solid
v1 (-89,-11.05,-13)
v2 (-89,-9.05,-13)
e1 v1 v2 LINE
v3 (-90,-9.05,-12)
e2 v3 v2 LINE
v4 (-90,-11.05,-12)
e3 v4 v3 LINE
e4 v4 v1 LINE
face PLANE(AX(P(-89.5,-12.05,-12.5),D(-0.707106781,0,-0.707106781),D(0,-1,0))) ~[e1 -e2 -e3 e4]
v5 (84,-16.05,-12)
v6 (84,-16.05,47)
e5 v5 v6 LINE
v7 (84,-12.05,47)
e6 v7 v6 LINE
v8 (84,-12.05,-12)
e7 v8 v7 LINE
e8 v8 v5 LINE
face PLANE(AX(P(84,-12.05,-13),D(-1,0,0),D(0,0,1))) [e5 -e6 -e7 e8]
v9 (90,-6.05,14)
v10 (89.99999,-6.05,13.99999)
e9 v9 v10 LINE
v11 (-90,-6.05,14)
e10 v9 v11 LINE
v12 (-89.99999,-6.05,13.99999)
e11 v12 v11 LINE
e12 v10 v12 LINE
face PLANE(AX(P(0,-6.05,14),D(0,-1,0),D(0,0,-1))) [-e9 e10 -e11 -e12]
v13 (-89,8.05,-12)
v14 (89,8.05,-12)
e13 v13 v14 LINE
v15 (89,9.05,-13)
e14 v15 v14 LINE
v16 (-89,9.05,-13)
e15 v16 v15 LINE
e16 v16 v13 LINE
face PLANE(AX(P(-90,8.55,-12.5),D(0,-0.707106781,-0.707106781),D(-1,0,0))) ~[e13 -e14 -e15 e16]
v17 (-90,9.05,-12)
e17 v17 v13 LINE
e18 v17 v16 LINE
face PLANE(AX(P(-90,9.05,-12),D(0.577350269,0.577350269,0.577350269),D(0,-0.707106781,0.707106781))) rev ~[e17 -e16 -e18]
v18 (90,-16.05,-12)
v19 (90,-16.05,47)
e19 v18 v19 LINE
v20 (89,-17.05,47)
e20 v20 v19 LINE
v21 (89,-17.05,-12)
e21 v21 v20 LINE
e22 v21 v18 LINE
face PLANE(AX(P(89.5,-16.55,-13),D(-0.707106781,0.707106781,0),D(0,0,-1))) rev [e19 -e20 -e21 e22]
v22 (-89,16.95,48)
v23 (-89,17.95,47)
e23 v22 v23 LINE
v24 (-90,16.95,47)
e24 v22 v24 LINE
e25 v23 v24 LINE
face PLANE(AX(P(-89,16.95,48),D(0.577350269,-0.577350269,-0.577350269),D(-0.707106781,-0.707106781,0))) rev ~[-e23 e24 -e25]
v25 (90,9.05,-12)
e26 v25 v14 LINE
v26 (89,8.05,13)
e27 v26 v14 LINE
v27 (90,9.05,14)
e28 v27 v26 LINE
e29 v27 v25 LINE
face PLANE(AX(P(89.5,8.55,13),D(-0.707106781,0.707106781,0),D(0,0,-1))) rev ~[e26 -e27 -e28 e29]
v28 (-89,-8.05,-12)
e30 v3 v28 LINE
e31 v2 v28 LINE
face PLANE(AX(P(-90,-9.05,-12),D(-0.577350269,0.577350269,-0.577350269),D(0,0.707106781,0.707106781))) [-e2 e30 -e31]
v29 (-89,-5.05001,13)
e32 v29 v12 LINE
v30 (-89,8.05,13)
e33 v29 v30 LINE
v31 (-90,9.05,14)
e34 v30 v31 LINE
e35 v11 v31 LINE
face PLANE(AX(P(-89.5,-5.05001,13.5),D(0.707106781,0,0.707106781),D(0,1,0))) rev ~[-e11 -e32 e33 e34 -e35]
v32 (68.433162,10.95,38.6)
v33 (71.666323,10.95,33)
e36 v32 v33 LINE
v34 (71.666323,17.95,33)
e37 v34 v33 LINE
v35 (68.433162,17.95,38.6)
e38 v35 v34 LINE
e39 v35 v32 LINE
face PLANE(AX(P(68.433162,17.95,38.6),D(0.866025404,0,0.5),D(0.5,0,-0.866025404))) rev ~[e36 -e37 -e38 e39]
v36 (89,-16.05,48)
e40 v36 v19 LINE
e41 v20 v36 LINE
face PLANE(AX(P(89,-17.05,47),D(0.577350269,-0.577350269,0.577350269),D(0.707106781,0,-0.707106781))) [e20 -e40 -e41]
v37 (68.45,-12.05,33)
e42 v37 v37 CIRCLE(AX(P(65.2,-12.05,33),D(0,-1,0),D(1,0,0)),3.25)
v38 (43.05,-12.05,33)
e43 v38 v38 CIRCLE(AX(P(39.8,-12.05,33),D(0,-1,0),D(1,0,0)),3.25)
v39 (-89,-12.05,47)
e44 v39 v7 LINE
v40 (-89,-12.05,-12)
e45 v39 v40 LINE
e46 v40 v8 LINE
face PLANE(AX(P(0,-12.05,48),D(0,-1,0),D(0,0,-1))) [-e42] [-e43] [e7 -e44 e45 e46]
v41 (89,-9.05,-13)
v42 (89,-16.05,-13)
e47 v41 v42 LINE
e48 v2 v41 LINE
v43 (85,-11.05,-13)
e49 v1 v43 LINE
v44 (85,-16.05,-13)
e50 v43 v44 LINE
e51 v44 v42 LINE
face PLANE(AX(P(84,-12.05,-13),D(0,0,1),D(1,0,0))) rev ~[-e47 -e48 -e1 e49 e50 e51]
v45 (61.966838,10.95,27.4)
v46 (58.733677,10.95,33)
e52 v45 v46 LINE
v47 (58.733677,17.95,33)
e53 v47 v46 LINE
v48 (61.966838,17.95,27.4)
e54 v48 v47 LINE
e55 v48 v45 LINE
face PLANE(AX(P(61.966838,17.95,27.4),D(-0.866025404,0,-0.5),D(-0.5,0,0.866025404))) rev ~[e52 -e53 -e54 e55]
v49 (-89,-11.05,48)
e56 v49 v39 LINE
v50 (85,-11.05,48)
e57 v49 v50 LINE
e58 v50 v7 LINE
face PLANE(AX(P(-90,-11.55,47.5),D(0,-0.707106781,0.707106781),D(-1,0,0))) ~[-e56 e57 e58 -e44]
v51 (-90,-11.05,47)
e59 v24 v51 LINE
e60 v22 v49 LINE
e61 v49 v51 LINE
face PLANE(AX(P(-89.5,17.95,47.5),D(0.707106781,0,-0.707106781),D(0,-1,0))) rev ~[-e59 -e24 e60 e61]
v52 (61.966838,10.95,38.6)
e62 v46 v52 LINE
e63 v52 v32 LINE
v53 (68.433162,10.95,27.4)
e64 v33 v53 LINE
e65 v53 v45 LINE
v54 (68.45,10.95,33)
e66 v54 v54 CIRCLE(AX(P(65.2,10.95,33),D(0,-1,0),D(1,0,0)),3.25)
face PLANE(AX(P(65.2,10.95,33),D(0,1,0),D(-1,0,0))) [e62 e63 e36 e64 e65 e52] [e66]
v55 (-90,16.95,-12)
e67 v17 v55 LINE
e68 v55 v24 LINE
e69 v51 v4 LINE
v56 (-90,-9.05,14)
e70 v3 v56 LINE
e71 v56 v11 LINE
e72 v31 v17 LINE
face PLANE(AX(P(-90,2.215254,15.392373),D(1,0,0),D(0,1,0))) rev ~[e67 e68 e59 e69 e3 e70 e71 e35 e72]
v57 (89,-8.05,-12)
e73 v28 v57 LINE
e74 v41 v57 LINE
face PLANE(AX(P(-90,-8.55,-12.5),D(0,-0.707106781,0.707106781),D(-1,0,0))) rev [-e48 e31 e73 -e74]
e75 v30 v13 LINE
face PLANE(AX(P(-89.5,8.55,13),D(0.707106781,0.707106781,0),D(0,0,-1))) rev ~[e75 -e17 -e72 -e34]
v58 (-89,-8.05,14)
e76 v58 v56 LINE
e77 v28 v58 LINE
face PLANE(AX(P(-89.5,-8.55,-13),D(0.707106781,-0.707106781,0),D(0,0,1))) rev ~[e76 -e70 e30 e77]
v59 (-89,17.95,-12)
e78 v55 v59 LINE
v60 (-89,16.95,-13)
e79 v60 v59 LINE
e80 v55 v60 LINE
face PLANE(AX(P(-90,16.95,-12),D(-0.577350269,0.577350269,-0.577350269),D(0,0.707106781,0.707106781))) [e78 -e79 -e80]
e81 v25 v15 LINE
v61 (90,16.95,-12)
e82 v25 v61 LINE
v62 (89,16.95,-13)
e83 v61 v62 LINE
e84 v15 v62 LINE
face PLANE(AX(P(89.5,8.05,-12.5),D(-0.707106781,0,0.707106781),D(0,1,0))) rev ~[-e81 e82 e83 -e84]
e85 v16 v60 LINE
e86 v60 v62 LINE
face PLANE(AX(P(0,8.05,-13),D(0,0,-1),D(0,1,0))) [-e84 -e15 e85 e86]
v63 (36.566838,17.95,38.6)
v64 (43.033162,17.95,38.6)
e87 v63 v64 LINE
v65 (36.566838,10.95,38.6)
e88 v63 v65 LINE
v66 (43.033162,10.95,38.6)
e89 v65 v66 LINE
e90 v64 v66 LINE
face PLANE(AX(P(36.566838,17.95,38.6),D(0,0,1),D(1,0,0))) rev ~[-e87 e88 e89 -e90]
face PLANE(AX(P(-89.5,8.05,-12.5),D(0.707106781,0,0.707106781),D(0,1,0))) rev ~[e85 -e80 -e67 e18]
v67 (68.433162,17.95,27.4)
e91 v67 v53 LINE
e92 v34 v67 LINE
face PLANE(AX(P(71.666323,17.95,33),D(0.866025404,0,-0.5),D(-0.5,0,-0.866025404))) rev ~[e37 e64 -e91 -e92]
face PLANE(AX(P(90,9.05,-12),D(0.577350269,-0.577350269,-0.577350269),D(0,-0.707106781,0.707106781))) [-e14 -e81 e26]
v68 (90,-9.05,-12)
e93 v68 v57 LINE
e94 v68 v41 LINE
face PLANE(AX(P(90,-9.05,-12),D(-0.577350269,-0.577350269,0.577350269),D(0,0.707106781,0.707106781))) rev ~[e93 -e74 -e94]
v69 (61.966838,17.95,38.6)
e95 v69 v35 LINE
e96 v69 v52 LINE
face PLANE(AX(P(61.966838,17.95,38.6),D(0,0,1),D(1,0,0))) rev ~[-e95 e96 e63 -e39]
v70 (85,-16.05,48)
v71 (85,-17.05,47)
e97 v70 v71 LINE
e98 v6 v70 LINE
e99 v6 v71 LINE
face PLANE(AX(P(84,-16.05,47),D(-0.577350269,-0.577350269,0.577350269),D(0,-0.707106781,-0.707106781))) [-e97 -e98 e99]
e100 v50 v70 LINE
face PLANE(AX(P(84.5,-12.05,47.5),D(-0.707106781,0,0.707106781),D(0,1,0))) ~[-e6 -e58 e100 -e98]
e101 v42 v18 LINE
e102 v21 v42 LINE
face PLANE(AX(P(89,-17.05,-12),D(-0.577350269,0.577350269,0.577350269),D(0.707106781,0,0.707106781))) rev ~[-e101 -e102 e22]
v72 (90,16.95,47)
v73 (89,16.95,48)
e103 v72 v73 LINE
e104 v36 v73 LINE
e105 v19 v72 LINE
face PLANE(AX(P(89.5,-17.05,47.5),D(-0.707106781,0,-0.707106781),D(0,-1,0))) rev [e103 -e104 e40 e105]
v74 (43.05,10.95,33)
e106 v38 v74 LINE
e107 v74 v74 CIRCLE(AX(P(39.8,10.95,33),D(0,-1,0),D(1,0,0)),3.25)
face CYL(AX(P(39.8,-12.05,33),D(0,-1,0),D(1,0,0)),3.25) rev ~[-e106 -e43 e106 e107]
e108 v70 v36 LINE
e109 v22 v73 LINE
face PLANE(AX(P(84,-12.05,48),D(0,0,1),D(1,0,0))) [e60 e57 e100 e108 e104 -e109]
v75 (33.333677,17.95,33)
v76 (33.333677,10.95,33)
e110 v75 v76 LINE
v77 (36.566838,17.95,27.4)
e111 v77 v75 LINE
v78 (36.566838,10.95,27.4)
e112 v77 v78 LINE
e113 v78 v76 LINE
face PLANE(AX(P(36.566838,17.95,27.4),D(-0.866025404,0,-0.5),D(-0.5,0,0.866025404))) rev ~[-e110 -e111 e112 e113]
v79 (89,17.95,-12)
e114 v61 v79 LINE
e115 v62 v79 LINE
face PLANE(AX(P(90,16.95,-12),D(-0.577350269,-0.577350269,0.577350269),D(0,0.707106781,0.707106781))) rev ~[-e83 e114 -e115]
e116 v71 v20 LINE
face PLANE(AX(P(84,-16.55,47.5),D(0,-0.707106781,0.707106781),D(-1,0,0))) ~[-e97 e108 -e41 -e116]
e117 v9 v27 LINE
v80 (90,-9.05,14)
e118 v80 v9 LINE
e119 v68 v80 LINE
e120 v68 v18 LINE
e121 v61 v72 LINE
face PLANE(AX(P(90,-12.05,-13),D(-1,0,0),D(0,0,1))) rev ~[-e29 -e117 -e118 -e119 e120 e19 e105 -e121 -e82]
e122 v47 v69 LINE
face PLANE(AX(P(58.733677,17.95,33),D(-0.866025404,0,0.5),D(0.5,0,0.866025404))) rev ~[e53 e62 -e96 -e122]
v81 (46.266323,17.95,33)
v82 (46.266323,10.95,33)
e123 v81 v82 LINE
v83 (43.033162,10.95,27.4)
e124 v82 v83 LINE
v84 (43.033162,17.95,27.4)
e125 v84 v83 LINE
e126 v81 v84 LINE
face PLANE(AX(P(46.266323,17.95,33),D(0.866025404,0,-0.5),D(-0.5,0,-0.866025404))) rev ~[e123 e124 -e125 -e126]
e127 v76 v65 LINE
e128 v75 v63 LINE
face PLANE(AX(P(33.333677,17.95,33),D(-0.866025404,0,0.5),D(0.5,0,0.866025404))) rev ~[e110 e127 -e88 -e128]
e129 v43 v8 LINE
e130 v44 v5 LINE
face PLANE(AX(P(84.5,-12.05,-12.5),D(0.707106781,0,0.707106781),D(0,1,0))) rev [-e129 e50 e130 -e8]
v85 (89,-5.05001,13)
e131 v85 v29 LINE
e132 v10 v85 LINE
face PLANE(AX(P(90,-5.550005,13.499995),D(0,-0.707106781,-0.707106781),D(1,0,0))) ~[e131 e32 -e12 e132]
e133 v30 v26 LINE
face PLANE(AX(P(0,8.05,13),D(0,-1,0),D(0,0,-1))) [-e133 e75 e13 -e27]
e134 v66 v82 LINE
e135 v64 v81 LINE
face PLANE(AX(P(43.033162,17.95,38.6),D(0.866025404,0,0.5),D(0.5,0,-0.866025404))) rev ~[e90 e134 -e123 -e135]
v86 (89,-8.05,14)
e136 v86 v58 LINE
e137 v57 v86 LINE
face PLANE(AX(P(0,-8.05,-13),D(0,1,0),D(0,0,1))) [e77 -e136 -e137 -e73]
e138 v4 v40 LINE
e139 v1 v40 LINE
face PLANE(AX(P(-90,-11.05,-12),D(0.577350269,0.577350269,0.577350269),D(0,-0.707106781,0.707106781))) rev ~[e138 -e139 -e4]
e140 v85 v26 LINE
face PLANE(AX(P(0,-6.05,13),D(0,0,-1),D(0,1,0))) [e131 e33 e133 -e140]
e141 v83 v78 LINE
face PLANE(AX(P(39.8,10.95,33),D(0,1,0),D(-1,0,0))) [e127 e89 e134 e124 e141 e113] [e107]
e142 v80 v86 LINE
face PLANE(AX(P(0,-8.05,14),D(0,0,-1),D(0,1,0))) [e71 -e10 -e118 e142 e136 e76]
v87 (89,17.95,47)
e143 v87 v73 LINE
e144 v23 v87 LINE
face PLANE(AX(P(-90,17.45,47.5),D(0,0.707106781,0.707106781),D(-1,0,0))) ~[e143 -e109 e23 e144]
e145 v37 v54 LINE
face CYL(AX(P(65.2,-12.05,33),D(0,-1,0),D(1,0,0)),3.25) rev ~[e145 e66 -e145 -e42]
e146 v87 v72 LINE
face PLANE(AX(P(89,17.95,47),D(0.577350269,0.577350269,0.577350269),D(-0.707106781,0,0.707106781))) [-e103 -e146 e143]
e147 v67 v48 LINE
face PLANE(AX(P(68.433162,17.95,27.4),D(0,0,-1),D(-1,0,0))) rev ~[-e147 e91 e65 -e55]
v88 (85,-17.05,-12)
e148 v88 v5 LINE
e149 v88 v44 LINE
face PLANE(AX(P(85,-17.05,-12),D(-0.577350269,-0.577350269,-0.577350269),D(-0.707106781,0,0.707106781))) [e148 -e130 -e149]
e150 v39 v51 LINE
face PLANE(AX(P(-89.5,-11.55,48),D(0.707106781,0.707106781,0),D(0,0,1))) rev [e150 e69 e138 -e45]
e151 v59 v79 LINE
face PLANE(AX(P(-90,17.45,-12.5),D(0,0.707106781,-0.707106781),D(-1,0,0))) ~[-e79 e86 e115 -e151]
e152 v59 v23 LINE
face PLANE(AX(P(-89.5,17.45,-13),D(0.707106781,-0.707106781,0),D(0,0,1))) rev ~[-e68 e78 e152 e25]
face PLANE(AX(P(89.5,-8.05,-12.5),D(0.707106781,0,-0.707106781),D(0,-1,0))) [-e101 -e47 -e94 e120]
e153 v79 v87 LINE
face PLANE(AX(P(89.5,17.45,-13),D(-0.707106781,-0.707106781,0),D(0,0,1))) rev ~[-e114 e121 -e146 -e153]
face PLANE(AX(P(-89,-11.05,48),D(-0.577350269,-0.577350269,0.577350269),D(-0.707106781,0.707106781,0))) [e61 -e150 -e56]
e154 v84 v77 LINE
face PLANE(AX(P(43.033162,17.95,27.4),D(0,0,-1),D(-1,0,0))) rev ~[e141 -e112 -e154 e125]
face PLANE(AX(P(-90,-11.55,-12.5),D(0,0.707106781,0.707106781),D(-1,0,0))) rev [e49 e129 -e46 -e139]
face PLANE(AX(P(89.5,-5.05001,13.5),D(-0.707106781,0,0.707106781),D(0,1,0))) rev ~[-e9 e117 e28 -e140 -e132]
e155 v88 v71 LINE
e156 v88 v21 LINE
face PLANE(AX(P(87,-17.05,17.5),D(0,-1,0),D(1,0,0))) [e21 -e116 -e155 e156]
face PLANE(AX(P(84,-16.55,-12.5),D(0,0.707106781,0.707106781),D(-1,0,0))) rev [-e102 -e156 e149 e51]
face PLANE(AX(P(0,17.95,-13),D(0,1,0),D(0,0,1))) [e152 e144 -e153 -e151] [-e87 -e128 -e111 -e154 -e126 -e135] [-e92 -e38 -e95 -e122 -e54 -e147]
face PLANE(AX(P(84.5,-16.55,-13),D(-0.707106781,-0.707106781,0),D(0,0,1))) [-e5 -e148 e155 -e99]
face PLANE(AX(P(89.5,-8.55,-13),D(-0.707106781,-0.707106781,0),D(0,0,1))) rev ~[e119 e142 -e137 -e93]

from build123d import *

# Parameters (mm, degrees)
F1_DEPTH = 90
F2_W     = 6
F2_H     = 61
F3_DEPTH = 5
F4_R     = 3.25
F5_DEPTH = 30.001
F7_DEPTH = 7
F8_SIZE  = 0.99999
F9_SIZE  = 1


# Not quite as in the source:
# - a fillet or chamfer is up to 0.001 mm smaller than in the source, because OpenCascade refuses the exact size


with BuildPart() as f1:
    # F0 (on Right) → F1 (new body, symmetric)
    with BuildSketch(Plane.YZ):
        Polygon((-6.05, 13), (8.05, 13), (8.05, -13), (17.95, -13), (17.95, 48), (-12.05, 48), (-12.05, -13), (-8.05, -13), (-8.05, 14), (-6.05, 14), align=None)
    extrude(amount=F1_DEPTH, both=True)

    # F2 (on face) → F3 (join)
    with BuildSketch(Plane.XZ.offset(12.05)):
        with Locations((87, 17.5)):
            Rectangle(F2_W, F2_H)
    extrude(amount=F3_DEPTH)

    # F4 (on face) → F5 (cut, through all)
    with BuildSketch(Plane.XZ.offset(12.05)):
        with Locations((39.8, 33)):
            Circle(F4_R)
        with Locations((65.2, 33)):
            Circle(F4_R)
    extrude(amount=-F5_DEPTH, mode=Mode.SUBTRACT)

    # F6 (on face) → F7 (cut)
    with BuildSketch(Plane(origin=(0, 17.95, 0), x_dir=(-1, 0, 0), z_dir=(0, 1, 0))):
        Polygon((-61.9668384925, 38.6), (-68.4331615075, 38.6), (-71.6663230149, 33), (-68.4331615075, 27.4), (-61.9668384925, 27.4), (-58.7336769851, 33), align=None)
        Polygon((-36.5668384925, 38.6), (-43.0331615075, 38.6), (-46.2663230149, 33), (-43.0331615075, 27.4), (-36.5668384925, 27.4), (-33.3336769851, 33), align=None)
    extrude(amount=-F7_DEPTH, mode=Mode.SUBTRACT)

    # F8 (size 1 in the source; OpenCascade refuses exactly that, so slightly less here)
    f8_edges = [f1.edges().sort_by_distance(p)[0] for p in [
        (0, -6.05, 13),
    ]]
    chamfer(f8_edges, length=F8_SIZE)

    # F9
    f9_edges = [f1.edges().sort_by_distance(p)[0] for p in [
        (0, -8.05, -13),
        (0, 8.05, -13),
        (0, 17.95, -13),
        (-90, 13, -13),
        (-90, 8.05, 0),
        (90, 13, -13),
        (-3, -12.05, -13),
        (-90, -10.05, -13),
        (84, -14.55, -13),
        (90, -12.55, -13),
        (87, -17.05, -13),
        (-90, -12.05, 17.5),
        (-90, 17.95, 17.5),
        (-90, -8.05, 0.5),
        (90, 8.05, 0),
        (90, -8.05, 0.5),
        (90, 1.499995, 13),
        (-90, 1.499995, 13),
        (90, 0.45, 48),
        (90, 17.95, 17.5),
        (0, 17.95, 48),
        (-3, -12.05, 48),
        (-90, 2.95, 48),
        (87, -17.05, 48),
        (84, -14.55, 48),
        (90, -17.05, 17.5),
        (84, -17.05, 17.5),
    ]]
    chamfer(f9_edges, length=F9_SIZE)


solid = f1.part
